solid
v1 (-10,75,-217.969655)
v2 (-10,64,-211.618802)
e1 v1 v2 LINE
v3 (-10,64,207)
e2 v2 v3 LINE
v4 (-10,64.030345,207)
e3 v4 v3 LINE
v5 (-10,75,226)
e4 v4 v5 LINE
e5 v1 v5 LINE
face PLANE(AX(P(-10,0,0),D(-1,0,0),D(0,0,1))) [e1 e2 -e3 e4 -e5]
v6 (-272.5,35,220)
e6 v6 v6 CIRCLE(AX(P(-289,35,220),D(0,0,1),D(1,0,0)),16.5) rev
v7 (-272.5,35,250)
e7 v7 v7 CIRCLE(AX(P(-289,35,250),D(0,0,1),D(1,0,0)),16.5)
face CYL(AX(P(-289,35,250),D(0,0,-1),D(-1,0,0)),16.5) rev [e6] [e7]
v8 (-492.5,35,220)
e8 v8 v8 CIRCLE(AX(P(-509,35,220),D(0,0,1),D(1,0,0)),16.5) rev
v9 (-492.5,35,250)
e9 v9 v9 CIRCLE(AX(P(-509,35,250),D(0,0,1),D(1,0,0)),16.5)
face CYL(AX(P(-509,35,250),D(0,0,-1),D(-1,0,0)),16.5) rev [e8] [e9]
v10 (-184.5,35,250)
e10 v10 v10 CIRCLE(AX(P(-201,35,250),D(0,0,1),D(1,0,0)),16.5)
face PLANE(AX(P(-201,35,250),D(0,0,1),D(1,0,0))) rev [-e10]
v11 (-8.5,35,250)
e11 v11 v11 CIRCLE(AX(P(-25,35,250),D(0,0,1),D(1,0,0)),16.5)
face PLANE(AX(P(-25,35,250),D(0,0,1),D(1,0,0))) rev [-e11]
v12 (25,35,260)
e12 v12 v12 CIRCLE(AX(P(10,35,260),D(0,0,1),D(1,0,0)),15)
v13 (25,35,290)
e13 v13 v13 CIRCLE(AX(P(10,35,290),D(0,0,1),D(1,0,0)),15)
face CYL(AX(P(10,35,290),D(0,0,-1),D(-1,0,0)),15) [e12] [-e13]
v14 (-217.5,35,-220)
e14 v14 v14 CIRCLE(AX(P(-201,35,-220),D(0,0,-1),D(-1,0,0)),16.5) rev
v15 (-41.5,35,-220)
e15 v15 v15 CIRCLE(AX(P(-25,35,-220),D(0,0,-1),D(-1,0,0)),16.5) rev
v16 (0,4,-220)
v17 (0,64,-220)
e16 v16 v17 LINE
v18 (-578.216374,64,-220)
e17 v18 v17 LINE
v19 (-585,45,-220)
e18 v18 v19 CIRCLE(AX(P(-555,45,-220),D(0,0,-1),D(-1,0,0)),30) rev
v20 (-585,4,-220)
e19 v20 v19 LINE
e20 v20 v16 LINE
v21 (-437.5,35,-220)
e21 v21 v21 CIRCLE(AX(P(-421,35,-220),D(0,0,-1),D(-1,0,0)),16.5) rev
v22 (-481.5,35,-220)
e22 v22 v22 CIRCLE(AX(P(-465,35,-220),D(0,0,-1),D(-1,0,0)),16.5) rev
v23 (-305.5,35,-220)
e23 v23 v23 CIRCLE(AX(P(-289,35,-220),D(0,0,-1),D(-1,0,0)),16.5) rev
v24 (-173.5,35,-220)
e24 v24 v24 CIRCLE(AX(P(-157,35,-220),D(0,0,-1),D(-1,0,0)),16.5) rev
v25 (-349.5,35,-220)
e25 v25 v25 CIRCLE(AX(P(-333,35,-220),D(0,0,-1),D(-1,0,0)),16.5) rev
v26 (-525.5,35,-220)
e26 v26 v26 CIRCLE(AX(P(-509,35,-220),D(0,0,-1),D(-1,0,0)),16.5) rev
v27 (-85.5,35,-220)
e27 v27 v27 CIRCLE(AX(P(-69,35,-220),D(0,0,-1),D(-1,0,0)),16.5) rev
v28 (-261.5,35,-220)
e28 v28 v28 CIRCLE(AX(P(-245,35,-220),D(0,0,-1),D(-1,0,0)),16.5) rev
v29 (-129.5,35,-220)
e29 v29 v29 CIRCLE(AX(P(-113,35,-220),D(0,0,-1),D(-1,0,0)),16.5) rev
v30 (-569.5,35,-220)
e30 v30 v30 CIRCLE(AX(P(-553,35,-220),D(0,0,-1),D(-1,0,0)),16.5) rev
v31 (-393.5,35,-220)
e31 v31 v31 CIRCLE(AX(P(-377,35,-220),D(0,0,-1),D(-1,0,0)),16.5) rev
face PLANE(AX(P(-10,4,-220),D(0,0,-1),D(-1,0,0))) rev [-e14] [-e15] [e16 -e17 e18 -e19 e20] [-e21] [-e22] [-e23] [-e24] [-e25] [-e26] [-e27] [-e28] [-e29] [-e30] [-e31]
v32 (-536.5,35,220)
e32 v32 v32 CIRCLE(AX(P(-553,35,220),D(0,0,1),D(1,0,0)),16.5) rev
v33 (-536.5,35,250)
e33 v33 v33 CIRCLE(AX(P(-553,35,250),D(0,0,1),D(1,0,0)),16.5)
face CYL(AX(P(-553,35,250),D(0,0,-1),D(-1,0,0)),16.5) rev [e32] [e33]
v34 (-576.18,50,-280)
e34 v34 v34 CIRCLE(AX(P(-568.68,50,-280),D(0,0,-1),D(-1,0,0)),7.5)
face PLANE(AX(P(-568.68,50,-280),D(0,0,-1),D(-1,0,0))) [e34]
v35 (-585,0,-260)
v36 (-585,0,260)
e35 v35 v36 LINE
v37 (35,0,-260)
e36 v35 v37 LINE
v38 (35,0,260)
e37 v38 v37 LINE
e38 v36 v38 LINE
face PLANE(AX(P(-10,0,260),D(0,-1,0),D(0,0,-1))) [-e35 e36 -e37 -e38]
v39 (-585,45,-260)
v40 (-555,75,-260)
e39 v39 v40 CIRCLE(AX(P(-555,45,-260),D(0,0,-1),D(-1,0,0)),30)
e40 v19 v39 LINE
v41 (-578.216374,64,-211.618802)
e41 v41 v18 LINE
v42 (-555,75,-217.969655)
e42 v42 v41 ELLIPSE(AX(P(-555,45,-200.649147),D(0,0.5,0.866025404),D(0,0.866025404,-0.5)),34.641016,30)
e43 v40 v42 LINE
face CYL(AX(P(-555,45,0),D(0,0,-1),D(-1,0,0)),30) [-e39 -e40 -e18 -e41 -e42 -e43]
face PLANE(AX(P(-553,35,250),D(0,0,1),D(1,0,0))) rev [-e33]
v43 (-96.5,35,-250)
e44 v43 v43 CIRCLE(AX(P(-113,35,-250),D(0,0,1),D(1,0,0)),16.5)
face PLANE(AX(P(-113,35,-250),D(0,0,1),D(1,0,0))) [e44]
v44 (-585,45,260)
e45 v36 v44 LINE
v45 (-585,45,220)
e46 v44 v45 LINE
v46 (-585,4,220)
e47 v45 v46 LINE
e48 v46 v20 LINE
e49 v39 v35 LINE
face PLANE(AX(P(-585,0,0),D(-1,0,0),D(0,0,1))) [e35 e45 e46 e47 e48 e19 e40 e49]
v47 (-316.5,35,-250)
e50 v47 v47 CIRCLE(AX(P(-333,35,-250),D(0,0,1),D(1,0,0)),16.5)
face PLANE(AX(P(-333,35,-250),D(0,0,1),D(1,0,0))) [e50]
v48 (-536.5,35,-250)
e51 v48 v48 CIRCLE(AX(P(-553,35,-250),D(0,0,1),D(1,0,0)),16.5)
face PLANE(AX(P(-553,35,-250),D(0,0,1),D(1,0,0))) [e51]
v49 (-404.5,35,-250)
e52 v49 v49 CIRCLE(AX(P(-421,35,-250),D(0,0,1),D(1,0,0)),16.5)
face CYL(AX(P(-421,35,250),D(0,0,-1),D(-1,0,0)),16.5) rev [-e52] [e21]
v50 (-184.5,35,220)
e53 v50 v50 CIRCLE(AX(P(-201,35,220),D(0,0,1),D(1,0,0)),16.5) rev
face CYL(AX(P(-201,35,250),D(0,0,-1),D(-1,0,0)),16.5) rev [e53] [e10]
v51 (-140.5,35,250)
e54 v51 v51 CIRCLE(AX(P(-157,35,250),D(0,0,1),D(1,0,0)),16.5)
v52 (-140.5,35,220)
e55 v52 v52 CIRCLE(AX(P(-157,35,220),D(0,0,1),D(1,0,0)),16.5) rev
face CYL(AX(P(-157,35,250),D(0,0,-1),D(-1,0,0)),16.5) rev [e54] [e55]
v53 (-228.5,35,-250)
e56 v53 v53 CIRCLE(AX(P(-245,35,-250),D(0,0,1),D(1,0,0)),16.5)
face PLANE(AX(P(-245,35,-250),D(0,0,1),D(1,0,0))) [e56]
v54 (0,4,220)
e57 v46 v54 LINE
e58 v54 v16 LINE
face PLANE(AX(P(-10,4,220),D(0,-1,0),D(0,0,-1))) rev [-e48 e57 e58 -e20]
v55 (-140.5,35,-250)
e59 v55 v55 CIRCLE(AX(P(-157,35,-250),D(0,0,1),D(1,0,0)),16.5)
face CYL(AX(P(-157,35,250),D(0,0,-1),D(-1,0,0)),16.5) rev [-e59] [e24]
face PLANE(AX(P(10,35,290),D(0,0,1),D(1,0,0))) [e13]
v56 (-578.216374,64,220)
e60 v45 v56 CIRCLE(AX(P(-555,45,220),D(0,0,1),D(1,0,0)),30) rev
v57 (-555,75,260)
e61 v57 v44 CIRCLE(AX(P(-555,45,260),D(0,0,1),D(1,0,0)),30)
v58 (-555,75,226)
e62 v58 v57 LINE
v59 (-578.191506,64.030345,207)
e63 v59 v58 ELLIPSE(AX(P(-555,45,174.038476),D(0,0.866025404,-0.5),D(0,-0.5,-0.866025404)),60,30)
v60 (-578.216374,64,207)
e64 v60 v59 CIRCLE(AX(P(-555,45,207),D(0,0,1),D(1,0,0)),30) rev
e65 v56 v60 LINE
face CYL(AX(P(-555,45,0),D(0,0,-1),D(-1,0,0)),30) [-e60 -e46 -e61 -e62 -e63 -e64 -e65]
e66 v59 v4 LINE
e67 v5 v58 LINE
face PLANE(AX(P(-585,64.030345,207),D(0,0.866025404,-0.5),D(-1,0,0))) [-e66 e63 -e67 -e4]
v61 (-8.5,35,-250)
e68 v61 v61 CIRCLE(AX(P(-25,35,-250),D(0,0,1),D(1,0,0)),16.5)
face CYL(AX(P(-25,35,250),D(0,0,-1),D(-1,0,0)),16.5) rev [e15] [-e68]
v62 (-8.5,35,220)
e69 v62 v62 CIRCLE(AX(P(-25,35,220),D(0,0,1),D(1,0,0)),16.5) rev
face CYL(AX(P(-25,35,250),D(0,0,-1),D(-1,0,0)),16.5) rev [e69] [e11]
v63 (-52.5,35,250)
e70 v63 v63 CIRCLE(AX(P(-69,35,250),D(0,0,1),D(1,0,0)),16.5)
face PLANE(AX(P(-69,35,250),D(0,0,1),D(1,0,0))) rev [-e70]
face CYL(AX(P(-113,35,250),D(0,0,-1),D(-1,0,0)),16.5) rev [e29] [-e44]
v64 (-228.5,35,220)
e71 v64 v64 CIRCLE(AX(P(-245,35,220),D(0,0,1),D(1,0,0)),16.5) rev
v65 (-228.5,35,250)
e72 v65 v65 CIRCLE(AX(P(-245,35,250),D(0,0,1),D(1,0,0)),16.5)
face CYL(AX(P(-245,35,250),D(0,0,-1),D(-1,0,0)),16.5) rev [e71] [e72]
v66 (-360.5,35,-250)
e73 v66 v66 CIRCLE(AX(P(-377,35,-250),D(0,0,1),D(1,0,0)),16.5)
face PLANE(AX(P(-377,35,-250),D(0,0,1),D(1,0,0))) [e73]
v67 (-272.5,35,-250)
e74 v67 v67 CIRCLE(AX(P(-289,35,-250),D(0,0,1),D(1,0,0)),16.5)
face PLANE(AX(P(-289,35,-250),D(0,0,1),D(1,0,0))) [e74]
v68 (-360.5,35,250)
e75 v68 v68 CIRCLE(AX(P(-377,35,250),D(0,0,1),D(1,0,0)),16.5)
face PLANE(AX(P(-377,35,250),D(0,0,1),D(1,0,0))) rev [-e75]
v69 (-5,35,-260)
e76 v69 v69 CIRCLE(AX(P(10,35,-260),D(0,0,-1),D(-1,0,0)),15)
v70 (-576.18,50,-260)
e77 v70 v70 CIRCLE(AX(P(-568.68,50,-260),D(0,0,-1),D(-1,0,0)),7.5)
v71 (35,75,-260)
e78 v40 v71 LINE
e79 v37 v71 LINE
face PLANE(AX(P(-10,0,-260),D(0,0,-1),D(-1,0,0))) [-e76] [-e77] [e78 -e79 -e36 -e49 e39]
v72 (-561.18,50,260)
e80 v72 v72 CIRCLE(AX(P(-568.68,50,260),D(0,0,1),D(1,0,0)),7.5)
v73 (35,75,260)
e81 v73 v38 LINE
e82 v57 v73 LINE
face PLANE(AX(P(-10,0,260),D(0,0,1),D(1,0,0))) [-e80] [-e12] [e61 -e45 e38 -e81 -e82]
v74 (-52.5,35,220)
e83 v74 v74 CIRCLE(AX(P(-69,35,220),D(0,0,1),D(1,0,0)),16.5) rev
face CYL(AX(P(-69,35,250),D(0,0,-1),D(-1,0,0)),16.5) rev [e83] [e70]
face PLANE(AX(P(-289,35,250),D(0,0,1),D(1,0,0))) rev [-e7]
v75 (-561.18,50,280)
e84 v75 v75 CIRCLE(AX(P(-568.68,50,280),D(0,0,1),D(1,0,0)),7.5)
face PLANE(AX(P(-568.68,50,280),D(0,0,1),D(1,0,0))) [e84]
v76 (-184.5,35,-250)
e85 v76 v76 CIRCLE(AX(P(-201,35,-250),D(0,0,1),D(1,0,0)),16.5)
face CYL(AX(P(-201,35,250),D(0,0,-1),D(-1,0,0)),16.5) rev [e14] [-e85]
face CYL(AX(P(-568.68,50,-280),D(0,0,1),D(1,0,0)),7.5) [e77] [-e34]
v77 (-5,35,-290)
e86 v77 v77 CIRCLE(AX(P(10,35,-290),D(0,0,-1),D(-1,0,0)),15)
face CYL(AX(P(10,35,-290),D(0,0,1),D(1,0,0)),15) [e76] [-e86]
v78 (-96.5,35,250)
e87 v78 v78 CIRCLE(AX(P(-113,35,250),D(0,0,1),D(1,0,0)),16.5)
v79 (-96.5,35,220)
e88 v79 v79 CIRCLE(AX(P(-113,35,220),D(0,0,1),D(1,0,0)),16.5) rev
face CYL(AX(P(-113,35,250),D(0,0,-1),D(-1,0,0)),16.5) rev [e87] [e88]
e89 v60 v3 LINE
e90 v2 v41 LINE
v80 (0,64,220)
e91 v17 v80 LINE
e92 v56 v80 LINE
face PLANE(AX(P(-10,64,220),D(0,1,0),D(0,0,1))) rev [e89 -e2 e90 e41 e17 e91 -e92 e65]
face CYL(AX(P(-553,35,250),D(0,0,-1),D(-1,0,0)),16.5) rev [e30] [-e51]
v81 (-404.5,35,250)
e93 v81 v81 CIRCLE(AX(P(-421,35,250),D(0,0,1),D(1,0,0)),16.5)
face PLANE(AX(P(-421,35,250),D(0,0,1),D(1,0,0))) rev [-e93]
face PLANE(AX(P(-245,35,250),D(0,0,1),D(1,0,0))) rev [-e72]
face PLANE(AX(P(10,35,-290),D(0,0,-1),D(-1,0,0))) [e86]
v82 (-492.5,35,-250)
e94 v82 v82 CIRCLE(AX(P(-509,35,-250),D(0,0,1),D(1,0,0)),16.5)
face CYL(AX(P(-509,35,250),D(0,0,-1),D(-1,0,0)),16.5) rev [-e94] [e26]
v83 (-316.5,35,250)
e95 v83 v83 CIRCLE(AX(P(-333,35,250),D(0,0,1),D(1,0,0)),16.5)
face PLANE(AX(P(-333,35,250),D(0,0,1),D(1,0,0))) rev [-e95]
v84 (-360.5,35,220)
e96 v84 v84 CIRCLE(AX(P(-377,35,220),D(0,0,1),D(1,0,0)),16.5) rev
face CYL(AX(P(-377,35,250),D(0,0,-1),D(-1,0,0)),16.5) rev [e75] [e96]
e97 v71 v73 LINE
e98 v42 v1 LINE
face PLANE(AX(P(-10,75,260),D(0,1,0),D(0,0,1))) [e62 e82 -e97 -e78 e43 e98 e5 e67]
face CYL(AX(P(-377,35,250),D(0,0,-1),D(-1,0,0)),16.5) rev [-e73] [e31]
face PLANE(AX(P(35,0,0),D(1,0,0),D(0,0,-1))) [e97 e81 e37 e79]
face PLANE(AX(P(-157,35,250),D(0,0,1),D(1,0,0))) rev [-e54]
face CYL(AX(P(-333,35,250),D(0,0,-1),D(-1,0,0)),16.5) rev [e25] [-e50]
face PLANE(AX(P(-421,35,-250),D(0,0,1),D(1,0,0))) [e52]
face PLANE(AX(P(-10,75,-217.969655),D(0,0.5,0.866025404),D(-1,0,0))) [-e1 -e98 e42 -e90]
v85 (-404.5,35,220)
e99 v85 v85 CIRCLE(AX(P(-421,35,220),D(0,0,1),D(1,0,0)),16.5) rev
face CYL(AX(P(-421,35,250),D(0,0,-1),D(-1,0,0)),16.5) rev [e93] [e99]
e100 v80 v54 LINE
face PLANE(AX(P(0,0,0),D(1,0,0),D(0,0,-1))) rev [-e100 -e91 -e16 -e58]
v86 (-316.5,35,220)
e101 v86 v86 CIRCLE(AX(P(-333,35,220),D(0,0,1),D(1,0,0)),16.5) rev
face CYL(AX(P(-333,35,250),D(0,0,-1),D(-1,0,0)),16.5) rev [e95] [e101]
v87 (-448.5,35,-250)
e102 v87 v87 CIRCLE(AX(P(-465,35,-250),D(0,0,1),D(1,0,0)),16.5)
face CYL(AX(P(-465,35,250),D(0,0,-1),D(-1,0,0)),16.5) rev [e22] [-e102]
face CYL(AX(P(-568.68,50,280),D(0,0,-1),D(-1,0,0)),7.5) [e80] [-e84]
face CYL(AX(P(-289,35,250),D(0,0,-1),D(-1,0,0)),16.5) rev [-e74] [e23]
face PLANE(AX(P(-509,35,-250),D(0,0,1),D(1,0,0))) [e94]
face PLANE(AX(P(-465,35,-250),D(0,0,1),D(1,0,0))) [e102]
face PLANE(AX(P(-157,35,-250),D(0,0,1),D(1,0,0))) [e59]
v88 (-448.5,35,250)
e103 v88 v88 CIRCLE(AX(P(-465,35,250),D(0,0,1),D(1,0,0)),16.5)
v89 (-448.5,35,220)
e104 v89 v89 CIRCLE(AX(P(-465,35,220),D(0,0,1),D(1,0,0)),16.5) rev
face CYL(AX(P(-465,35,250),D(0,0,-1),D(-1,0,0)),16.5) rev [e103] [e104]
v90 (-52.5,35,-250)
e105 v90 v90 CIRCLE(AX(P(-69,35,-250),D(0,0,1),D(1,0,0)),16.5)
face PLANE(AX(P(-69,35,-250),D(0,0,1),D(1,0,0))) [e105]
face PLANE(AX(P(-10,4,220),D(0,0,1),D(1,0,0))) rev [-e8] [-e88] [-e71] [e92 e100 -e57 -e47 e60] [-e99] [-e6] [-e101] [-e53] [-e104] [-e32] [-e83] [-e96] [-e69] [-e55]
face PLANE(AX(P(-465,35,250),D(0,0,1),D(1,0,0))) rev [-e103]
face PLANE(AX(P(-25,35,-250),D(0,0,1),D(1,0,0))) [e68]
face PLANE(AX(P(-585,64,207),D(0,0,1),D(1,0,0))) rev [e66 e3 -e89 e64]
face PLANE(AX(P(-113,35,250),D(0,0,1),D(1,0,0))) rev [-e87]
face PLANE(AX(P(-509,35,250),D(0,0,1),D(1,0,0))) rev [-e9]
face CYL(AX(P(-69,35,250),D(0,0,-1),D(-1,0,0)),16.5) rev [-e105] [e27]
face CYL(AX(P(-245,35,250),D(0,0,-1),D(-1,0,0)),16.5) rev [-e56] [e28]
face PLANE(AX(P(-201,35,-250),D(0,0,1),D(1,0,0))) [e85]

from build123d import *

# Parameters (mm, degrees)
SKETCH1_W               = 520
SKETCH1_H               = 75
SKETCH1_W_2             = 440
SKETCH1_H_2             = 60
BOSS_EXTRUDE1_DEPTH     = 10
BOSS_EXTRUDE2_DEPTH     = 575
SKETCH3_W               = 520
SKETCH3_H               = 75
BOSS_EXTRUDE3_DEPTH     = 35
CHAMFER1_SIZE           = 19
CHAMFER1_SIZE_2         = 10.969655115
FILLET1_R               = 30
SKETCH4_R               = 7.5
BOSS_EXTRUDE4_DEPTH     = 20
BOSS_EXTRUDE5_START     = 20
SKETCH5_R               = 7.5
BOSS_EXTRUDE5_DEPTH     = 20
SKETCH6_R               = 15
BOSS_EXTRUDE6_DEPTH     = 30
BOSS_EXTRUDE7_START     = 30
SKETCH7_R               = 15
BOSS_EXTRUDE7_DEPTH     = 30
CUT_EXTRUDE1_DEPTH      = 250
CUT_EXTRUDE1_DEPTH_BACK = 250
SKETCH8_R               = 16.5


with BuildPart() as part:
    # Sketch1 → Boss-Extrude1 (new body)
    with BuildSketch(Plane(origin=(0, 0, 0), x_dir=(0, 0, -1), z_dir=(1, 0, 0))):
        with Locations((0, 37.5)):
            Rectangle(SKETCH1_W, SKETCH1_H)
        with Locations((0, 34)):
            Rectangle(SKETCH1_W_2, SKETCH1_H_2, mode=Mode.SUBTRACT)
    extrude(amount=-BOSS_EXTRUDE1_DEPTH)

    # Sketch2 → Boss-Extrude2 (add)
    with BuildSketch(Plane.ZY.offset(10)):
        Polygon((260, 0), (260, 75), (207, 75), (207, 64), (220, 64), (220, 4), (-220, 4), (-220, 64), (-207, 64), (-207, 75), (-260, 75), (-260, 0), align=None)
    extrude(amount=BOSS_EXTRUDE2_DEPTH)

    # Sketch3 → Boss-Extrude3 (add)
    with BuildSketch(Plane(origin=(0, 0, 0), x_dir=(0, 0, -1), z_dir=(1, 0, 0))):
        with Locations((0, 37.5)):
            Rectangle(SKETCH3_W, SKETCH3_H)
    extrude(amount=BOSS_EXTRUDE3_DEPTH)

    # Chamfer1
    # the kernel refuses this chamfer: 19, 10.969655115 mm, written as the material it takes off along each edge
    with BuildSketch(Plane(origin=(-10, 75, 207), x_dir=(0, 0.01932676561270119, 0.9998132206222079), z_dir=(-1, 0, 0))) as chamfer1_piece_1:
        Polygon((CHAMFER1_SIZE * 0.999813220622, -CHAMFER1_SIZE * 0.0193267656127), (-CHAMFER1_SIZE_2 * 0.019326765612, -CHAMFER1_SIZE_2 * 0.999813220586), (0, 0), align=None)
    extrude(amount=624.154629338, mode=Mode.SUBTRACT)
    with BuildSketch(Plane(origin=(-10, 75, -207), x_dir=(0, 0.057893862402678804, -0.9983227437537922), z_dir=(-1, 0, 0))) as chamfer1_piece_2:
        Polygon((CHAMFER1_SIZE_2 * 0.998322743718, CHAMFER1_SIZE_2 * 0.0578938624006), (-CHAMFER1_SIZE * 0.0578938624027, CHAMFER1_SIZE * 0.998322743754), (0, 0), align=None)
    extrude(amount=624.154629338, mode=Mode.SUBTRACT)

    # Fillet1
    fillet1_edges = [part.edges().sort_by_distance(p)[0] for p in [
        (-585, 75, 243),
        (-585, 75, -238.984827557),
    ]]
    fillet(fillet1_edges, radius=FILLET1_R)

    # Sketch4 → Boss-Extrude4 (add)
    with BuildSketch(Plane.XY.offset(260)):
        with Locations((-568.68, 50)):
            Circle(SKETCH4_R)
    extrude(amount=BOSS_EXTRUDE4_DEPTH)

    # Sketch5 → Boss-Extrude5 (add)
    with BuildSketch(Plane(origin=(0, 0, -260), x_dir=(-1, 0, 0), z_dir=(0, 0, -1)).offset(BOSS_EXTRUDE5_START)):
        with Locations(Location((568.68, 50, 0), (0, 0, 180))):
            Circle(SKETCH5_R)
    extrude(amount=-BOSS_EXTRUDE5_DEPTH)

    # Sketch6 → Boss-Extrude6 (add)
    with BuildSketch(Plane.XY.offset(260)):
        with Locations((10, 35)):
            Circle(SKETCH6_R)
    extrude(amount=BOSS_EXTRUDE6_DEPTH)

    # Sketch7 → Boss-Extrude7 (add)
    with BuildSketch(Plane(origin=(0, 0, -260), x_dir=(-1, 0, 0), z_dir=(0, 0, -1)).offset(BOSS_EXTRUDE7_START)):
        with Locations(Location((-10, 35, 0), (0, 0, 180))):
            Circle(SKETCH7_R)
    extrude(amount=-BOSS_EXTRUDE7_DEPTH)

    # Sketch8 → Cut-Extrude1 (cut, two sides: drawn at the far end of the back side and taken through both)
    with BuildSketch(Plane.XY.offset(-CUT_EXTRUDE1_DEPTH_BACK)):
        with Locations(Location((-25, 35, 0), (0, 0, 180))):
            Circle(SKETCH8_R)
        with Locations(Location((-69, 35, 0), (0, 0, 180))):
            Circle(SKETCH8_R)
        with Locations(Location((-113, 35, 0), (0, 0, 180))):
            Circle(SKETCH8_R)
        with Locations(Location((-157, 35, 0), (0, 0, 180))):
            Circle(SKETCH8_R)
        with Locations(Location((-201, 35, 0), (0, 0, 180))):
            Circle(SKETCH8_R)
        with Locations(Location((-245, 35, 0), (0, 0, 180))):
            Circle(SKETCH8_R)
        with Locations(Location((-289, 35, 0), (0, 0, 180))):
            Circle(SKETCH8_R)
        with Locations(Location((-333, 35, 0), (0, 0, 180))):
            Circle(SKETCH8_R)
        with Locations(Location((-377, 35, 0), (0, 0, 180))):
            Circle(SKETCH8_R)
        with Locations(Location((-421, 35, 0), (0, 0, 180))):
            Circle(SKETCH8_R)
        with Locations(Location((-465, 35, 0), (0, 0, 180))):
            Circle(SKETCH8_R)
        with Locations(Location((-509, 35, 0), (0, 0, 180))):
            Circle(SKETCH8_R)
        with Locations(Location((-553, 35, 0), (0, 0, 180))):
            Circle(SKETCH8_R)
    extrude(amount=CUT_EXTRUDE1_DEPTH + CUT_EXTRUDE1_DEPTH_BACK, mode=Mode.SUBTRACT)


solid = part.part
